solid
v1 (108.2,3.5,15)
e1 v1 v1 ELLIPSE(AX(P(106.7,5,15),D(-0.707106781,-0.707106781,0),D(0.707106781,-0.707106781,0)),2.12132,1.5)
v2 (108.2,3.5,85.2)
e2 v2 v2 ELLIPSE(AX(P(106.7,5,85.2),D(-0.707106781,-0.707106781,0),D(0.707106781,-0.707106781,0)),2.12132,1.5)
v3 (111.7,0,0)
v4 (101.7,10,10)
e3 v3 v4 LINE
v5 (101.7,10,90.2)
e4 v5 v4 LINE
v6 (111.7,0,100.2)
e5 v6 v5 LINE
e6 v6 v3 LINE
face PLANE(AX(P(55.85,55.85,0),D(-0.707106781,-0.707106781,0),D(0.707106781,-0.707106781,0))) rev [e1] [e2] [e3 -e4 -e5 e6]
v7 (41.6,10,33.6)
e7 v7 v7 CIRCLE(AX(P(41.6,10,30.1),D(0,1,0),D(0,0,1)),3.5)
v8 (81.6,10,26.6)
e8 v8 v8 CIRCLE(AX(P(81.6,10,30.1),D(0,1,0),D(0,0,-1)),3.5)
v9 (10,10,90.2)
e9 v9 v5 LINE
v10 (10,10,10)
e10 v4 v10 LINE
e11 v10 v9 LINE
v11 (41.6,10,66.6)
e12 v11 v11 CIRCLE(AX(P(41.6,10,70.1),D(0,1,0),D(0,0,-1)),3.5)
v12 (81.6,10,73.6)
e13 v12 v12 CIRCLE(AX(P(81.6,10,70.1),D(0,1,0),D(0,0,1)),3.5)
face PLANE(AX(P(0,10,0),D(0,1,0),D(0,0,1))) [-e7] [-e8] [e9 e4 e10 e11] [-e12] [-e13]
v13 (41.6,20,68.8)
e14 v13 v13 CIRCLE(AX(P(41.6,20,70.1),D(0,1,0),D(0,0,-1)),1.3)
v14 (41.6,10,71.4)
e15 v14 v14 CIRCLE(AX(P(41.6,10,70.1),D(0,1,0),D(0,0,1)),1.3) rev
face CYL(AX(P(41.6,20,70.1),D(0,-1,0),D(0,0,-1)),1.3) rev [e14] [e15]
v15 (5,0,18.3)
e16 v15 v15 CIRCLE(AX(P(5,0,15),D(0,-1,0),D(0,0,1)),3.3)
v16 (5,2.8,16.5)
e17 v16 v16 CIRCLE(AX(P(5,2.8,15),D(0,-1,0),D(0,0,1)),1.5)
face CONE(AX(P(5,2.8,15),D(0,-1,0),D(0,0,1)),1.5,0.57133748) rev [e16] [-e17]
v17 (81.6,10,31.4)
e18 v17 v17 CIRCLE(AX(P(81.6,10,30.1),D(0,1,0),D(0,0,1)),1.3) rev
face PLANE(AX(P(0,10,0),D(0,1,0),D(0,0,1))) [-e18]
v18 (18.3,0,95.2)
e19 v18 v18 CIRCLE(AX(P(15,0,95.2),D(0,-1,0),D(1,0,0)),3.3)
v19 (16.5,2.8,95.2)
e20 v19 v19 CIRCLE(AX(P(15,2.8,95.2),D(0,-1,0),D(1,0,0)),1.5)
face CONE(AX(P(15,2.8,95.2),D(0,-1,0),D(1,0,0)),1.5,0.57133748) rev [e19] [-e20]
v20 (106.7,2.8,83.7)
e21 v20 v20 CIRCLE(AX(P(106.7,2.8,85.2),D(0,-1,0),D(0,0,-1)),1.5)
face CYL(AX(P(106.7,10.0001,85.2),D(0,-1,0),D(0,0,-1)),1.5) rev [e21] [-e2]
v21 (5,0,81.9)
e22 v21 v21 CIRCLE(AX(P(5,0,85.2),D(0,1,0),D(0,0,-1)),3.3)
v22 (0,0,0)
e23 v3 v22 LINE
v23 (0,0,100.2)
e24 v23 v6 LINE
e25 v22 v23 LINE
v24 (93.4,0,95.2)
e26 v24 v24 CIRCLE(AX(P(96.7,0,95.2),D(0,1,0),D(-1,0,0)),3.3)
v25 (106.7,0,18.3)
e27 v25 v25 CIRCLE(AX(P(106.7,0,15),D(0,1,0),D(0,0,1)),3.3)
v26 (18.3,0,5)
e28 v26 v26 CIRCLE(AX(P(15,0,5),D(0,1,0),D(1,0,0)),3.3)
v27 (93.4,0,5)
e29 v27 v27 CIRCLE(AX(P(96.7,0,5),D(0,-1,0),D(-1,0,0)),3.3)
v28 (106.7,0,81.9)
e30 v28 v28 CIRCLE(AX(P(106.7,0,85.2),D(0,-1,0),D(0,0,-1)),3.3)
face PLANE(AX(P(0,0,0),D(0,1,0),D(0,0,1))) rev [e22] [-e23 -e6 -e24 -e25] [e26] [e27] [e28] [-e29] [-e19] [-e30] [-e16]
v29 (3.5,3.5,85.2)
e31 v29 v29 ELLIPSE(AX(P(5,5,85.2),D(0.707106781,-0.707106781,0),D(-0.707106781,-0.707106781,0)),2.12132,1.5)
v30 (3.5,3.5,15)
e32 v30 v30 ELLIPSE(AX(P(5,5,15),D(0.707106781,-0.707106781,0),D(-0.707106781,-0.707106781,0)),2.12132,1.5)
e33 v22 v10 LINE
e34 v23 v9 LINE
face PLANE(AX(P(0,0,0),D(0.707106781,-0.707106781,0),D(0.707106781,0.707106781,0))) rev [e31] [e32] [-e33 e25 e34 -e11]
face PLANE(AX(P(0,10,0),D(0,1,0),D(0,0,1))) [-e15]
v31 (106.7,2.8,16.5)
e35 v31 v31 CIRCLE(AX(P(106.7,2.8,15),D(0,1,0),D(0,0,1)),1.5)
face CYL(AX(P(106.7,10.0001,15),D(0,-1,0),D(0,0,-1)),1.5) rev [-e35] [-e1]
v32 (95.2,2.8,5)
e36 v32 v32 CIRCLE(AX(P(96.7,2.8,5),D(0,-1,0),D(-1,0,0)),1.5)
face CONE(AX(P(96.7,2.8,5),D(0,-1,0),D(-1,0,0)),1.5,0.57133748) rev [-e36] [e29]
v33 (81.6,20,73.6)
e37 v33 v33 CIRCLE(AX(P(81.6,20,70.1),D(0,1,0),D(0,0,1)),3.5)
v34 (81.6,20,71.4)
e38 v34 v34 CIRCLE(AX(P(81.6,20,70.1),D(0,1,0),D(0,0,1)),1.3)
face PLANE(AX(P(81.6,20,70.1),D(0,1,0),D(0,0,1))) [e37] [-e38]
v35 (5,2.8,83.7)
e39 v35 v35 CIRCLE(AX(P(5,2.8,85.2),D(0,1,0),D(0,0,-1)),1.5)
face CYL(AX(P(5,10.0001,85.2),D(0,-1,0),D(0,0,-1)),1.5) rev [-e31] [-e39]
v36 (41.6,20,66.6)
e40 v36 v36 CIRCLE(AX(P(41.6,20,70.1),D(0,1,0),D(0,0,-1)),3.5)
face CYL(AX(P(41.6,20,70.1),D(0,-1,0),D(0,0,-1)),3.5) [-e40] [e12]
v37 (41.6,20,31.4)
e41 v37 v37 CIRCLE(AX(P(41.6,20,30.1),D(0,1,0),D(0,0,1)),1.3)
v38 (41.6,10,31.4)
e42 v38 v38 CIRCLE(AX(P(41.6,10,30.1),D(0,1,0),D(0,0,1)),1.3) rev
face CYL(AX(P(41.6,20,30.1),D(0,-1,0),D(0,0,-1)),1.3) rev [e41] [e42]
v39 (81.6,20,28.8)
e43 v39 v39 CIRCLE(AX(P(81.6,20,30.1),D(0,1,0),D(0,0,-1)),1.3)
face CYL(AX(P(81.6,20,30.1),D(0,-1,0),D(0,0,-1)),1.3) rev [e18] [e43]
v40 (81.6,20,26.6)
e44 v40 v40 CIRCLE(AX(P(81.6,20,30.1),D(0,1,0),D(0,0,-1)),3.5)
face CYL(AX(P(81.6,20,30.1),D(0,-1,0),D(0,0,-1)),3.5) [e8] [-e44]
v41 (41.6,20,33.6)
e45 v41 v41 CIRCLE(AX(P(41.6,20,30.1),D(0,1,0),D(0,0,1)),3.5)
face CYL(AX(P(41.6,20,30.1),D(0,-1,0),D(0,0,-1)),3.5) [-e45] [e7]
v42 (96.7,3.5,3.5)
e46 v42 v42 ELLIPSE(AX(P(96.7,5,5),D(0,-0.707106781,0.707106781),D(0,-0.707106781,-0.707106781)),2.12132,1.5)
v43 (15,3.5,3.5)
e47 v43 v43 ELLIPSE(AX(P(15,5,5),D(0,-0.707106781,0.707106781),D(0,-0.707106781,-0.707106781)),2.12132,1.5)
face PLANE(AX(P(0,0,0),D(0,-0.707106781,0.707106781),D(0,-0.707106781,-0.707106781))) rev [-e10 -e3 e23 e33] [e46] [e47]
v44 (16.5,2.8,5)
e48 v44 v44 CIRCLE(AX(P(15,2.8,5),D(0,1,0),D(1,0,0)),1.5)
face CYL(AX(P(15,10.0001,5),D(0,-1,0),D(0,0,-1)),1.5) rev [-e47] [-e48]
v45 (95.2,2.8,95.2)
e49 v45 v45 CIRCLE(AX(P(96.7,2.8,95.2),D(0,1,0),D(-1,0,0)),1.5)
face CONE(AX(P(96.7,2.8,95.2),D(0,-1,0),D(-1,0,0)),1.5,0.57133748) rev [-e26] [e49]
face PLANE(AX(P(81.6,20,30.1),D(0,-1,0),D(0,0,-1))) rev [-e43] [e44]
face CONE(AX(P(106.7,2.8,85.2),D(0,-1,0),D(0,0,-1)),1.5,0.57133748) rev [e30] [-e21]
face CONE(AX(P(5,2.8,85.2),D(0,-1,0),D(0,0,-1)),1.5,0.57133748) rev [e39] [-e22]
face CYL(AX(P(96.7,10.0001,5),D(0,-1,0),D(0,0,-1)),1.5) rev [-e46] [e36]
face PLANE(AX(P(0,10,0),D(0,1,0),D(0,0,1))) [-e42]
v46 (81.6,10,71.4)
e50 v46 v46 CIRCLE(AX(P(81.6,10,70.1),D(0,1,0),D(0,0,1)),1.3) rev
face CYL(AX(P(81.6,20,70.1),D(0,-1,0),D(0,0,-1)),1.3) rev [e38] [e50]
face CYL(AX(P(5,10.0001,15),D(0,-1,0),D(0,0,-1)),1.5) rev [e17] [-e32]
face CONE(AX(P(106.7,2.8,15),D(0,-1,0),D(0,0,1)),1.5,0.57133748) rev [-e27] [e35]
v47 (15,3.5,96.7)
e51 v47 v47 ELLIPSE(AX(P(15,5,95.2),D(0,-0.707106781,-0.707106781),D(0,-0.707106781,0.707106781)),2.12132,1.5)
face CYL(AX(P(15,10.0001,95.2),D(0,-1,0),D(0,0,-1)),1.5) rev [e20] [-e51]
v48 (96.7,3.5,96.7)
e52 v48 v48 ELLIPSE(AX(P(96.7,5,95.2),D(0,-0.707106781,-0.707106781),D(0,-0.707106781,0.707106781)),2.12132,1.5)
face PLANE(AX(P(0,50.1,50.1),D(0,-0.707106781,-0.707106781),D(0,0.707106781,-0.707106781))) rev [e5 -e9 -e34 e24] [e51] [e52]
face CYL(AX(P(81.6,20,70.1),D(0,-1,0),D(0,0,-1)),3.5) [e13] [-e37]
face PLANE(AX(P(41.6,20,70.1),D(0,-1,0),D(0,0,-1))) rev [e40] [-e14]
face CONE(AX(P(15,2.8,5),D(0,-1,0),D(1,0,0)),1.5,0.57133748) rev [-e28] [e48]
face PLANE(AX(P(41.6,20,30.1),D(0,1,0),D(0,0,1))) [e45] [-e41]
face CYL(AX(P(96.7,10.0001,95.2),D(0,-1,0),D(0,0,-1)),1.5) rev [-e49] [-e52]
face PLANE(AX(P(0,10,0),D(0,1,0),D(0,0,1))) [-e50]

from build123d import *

# Parameters (mm, degrees)
SKETCH3_R           = 1.5
CUT_EXTRUDE1_DEPTH  = 151.389261732
SKETCH4_R           = 3.5
SKETCH4_R_2         = 1.3
BOSS_EXTRUDE1_DEPTH = 10
SKETCH5_R           = 3.3
SKETCH6_R           = 1.5


# Read off the part's stored shape, not the designer's step: Mirror2, Mirror3
with BuildPart() as part:
    # Sketch1 → Loft1 section 0
    with BuildSketch(Plane(origin=(0, 0, 0), x_dir=(1, 0, 0), z_dir=(0, 1, 0))):
        with BuildLine():
            Line((0, 0), (111.7, 0))
            Line((111.7, 0), (111.7, -100.2))
            Line((111.7, -100.2), (0, -100.2))
            Line((0, -100.2), (0, 0))
        make_face()
    # Sketch2 → Loft1 section 1
    with BuildSketch(Plane(origin=(0, 10, 0), x_dir=(1, 0, 0), z_dir=(0, 1, 0))):
        with BuildLine():
            Line((10, -10), (10, -90.2))
            Line((10, -90.2), (101.7, -90.2))
            Line((101.7, -90.2), (101.7, -10))
            Line((101.7, -10), (10, -10))
        make_face()
    loft()

    # Sketch3 → Cut-Extrude1 (cut, through all)
    with BuildSketch(Plane.XZ):
        with Locations(Location((5, 15, 0), (0, 0, 270))):
            Circle(SKETCH3_R)
        with Locations(Location((5, 85.2, 0), (0, 0, 180))):
            Circle(SKETCH3_R)
        with Locations(Location((106.7, 85.2, 0), (0, 0, 270))):
            Circle(SKETCH3_R)
        with Locations((106.7, 15)):
            Circle(SKETCH3_R)
        with Locations(Location((15, 5, 0), (0, 0, 270))):
            Circle(SKETCH3_R)
        with Locations(Location((15, 95.2, 0), (0, 0, 270))):
            Circle(SKETCH3_R)
        with Locations(Location((96.7, 95.2, 0), (0, 0, 90))):
            Circle(SKETCH3_R)
        with Locations(Location((96.7, 5, 0), (0, 0, 270))):
            Circle(SKETCH3_R)
    extrude(amount=-CUT_EXTRUDE1_DEPTH, mode=Mode.SUBTRACT)

    # Sketch4 → Boss-Extrude1 (add)
    # profile 1 of 4: a face of its own
    with BuildSketch(Plane(origin=(0, 10, 0), x_dir=(1, 0, 0), z_dir=(0, 1, 0))):
        with Locations(Location((81.6, -70.1, 0), (0, 0, 270))):
            Circle(SKETCH4_R)
        with Locations(Location((81.6, -70.1, 0), (0, 0, 270))):
            Circle(SKETCH4_R_2, mode=Mode.SUBTRACT)
    # profile 2 of 4: a face of its own
    with BuildSketch(Plane(origin=(0, 10, 0), x_dir=(1, 0, 0), z_dir=(0, 1, 0))):
        with Locations(Location((81.6, -30.1, 0), (0, 0, 90))):
            Circle(SKETCH4_R)
        with Locations(Location((81.6, -30.1, 0), (0, 0, 90))):
            Circle(SKETCH4_R_2, mode=Mode.SUBTRACT)
    # profile 3 of 4: a face of its own
    with BuildSketch(Plane(origin=(0, 10, 0), x_dir=(1, 0, 0), z_dir=(0, 1, 0))):
        with Locations(Location((41.6, -70.1, 0), (0, 0, 90))):
            Circle(SKETCH4_R)
        with Locations(Location((41.6, -70.1, 0), (0, 0, 90))):
            Circle(SKETCH4_R_2, mode=Mode.SUBTRACT)
    # profile 4 of 4: a face of its own
    with BuildSketch(Plane(origin=(0, 10, 0), x_dir=(1, 0, 0), z_dir=(0, 1, 0))):
        with Locations(Location((41.6, -30.1, 0), (0, 0, 270))):
            Circle(SKETCH4_R)
        with Locations(Location((41.6, -30.1, 0), (0, 0, 270))):
            Circle(SKETCH4_R_2, mode=Mode.SUBTRACT)
    extrude(amount=BOSS_EXTRUDE1_DEPTH)

    # Sketch5 → Cut-Loft1 section 0
    with BuildSketch(Plane.XZ):
        with Locations((106.7, 85.2)):
            Circle(SKETCH5_R)
    # Sketch6 → Cut-Loft1 section 1
    with BuildSketch(Plane(origin=(0, 2.8, 0), x_dir=(-1, 0, 0), z_dir=(0, -1, 0))):
        with Locations((-106.7, -85.2)):
            Circle(SKETCH6_R)
    cut_loft1 = loft(mode=Mode.SUBTRACT)

    # Mirror1: Cut-Loft1 across plane
    add(cut_loft1.mirror(Plane(origin=(5.75, 0, -5.75), x_dir=(0.7071067811865476, 0, 0.7071067811865476), z_dir=(0.7071067811865477, 0, -0.7071067811865475))), mode=Mode.SUBTRACT)

    # Mirror2 outline → Mirror2 (revolve, cut)
    with BuildSketch(Plane(origin=(106.7, 0, 15), x_dir=(1, 0, 0), z_dir=(0, 0, 1))):
        Polygon((3.3, 0), (1.5, 2.8), (1.5, 0), align=None)
    revolve(axis=Axis((106.7, 0, 15), (0, 1, 0)), mode=Mode.SUBTRACT)

    # Mirror2 2 outline → Mirror2 2 (revolve, cut)
    with BuildSketch(Plane(origin=(96.7, 0, 5), x_dir=(1, 0, 0), z_dir=(0, 0, 1))):
        Polygon((3.3, 0), (1.5, 2.8), (1.5, 0), align=None)
    revolve(axis=Axis((96.7, 0, 5), (0, 1, 0)), mode=Mode.SUBTRACT)

    # Mirror3 outline → Mirror3 (revolve, cut)
    with BuildSketch(Plane(origin=(5, 0, 85.2), x_dir=(1, 0, 0), z_dir=(0, 0, 1))):
        Polygon((3.3, 0), (1.5, 2.8), (1.5, 0), align=None)
    revolve(axis=Axis((5, 0, 85.2), (0, 1, 0)), mode=Mode.SUBTRACT)

    # Mirror3 2 outline → Mirror3 2 (revolve, cut)
    with BuildSketch(Plane(origin=(15, 0, 95.2), x_dir=(1, 0, 0), z_dir=(0, 0, 1))):
        Polygon((3.3, 0), (1.5, 2.8), (1.5, 0), align=None)
    revolve(axis=Axis((15, 0, 95.2), (0, 1, 0)), mode=Mode.SUBTRACT)

    # Mirror3 3 outline → Mirror3 3 (revolve, cut)
    with BuildSketch(Plane(origin=(5, 0, 15), x_dir=(1, 0, 0), z_dir=(0, 0, 1))):
        Polygon((3.3, 0), (1.5, 2.8), (1.5, 0), align=None)
    revolve(axis=Axis((5, 0, 15), (0, 1, 0)), mode=Mode.SUBTRACT)

    # Mirror3 4 outline → Mirror3 4 (revolve, cut)
    with BuildSketch(Plane(origin=(15, 0, 5), x_dir=(1, 0, 0), z_dir=(0, 0, 1))):
        Polygon((3.3, 0), (1.5, 2.8), (1.5, 0), align=None)
    revolve(axis=Axis((15, 0, 5), (0, 1, 0)), mode=Mode.SUBTRACT)


solid = part.part
